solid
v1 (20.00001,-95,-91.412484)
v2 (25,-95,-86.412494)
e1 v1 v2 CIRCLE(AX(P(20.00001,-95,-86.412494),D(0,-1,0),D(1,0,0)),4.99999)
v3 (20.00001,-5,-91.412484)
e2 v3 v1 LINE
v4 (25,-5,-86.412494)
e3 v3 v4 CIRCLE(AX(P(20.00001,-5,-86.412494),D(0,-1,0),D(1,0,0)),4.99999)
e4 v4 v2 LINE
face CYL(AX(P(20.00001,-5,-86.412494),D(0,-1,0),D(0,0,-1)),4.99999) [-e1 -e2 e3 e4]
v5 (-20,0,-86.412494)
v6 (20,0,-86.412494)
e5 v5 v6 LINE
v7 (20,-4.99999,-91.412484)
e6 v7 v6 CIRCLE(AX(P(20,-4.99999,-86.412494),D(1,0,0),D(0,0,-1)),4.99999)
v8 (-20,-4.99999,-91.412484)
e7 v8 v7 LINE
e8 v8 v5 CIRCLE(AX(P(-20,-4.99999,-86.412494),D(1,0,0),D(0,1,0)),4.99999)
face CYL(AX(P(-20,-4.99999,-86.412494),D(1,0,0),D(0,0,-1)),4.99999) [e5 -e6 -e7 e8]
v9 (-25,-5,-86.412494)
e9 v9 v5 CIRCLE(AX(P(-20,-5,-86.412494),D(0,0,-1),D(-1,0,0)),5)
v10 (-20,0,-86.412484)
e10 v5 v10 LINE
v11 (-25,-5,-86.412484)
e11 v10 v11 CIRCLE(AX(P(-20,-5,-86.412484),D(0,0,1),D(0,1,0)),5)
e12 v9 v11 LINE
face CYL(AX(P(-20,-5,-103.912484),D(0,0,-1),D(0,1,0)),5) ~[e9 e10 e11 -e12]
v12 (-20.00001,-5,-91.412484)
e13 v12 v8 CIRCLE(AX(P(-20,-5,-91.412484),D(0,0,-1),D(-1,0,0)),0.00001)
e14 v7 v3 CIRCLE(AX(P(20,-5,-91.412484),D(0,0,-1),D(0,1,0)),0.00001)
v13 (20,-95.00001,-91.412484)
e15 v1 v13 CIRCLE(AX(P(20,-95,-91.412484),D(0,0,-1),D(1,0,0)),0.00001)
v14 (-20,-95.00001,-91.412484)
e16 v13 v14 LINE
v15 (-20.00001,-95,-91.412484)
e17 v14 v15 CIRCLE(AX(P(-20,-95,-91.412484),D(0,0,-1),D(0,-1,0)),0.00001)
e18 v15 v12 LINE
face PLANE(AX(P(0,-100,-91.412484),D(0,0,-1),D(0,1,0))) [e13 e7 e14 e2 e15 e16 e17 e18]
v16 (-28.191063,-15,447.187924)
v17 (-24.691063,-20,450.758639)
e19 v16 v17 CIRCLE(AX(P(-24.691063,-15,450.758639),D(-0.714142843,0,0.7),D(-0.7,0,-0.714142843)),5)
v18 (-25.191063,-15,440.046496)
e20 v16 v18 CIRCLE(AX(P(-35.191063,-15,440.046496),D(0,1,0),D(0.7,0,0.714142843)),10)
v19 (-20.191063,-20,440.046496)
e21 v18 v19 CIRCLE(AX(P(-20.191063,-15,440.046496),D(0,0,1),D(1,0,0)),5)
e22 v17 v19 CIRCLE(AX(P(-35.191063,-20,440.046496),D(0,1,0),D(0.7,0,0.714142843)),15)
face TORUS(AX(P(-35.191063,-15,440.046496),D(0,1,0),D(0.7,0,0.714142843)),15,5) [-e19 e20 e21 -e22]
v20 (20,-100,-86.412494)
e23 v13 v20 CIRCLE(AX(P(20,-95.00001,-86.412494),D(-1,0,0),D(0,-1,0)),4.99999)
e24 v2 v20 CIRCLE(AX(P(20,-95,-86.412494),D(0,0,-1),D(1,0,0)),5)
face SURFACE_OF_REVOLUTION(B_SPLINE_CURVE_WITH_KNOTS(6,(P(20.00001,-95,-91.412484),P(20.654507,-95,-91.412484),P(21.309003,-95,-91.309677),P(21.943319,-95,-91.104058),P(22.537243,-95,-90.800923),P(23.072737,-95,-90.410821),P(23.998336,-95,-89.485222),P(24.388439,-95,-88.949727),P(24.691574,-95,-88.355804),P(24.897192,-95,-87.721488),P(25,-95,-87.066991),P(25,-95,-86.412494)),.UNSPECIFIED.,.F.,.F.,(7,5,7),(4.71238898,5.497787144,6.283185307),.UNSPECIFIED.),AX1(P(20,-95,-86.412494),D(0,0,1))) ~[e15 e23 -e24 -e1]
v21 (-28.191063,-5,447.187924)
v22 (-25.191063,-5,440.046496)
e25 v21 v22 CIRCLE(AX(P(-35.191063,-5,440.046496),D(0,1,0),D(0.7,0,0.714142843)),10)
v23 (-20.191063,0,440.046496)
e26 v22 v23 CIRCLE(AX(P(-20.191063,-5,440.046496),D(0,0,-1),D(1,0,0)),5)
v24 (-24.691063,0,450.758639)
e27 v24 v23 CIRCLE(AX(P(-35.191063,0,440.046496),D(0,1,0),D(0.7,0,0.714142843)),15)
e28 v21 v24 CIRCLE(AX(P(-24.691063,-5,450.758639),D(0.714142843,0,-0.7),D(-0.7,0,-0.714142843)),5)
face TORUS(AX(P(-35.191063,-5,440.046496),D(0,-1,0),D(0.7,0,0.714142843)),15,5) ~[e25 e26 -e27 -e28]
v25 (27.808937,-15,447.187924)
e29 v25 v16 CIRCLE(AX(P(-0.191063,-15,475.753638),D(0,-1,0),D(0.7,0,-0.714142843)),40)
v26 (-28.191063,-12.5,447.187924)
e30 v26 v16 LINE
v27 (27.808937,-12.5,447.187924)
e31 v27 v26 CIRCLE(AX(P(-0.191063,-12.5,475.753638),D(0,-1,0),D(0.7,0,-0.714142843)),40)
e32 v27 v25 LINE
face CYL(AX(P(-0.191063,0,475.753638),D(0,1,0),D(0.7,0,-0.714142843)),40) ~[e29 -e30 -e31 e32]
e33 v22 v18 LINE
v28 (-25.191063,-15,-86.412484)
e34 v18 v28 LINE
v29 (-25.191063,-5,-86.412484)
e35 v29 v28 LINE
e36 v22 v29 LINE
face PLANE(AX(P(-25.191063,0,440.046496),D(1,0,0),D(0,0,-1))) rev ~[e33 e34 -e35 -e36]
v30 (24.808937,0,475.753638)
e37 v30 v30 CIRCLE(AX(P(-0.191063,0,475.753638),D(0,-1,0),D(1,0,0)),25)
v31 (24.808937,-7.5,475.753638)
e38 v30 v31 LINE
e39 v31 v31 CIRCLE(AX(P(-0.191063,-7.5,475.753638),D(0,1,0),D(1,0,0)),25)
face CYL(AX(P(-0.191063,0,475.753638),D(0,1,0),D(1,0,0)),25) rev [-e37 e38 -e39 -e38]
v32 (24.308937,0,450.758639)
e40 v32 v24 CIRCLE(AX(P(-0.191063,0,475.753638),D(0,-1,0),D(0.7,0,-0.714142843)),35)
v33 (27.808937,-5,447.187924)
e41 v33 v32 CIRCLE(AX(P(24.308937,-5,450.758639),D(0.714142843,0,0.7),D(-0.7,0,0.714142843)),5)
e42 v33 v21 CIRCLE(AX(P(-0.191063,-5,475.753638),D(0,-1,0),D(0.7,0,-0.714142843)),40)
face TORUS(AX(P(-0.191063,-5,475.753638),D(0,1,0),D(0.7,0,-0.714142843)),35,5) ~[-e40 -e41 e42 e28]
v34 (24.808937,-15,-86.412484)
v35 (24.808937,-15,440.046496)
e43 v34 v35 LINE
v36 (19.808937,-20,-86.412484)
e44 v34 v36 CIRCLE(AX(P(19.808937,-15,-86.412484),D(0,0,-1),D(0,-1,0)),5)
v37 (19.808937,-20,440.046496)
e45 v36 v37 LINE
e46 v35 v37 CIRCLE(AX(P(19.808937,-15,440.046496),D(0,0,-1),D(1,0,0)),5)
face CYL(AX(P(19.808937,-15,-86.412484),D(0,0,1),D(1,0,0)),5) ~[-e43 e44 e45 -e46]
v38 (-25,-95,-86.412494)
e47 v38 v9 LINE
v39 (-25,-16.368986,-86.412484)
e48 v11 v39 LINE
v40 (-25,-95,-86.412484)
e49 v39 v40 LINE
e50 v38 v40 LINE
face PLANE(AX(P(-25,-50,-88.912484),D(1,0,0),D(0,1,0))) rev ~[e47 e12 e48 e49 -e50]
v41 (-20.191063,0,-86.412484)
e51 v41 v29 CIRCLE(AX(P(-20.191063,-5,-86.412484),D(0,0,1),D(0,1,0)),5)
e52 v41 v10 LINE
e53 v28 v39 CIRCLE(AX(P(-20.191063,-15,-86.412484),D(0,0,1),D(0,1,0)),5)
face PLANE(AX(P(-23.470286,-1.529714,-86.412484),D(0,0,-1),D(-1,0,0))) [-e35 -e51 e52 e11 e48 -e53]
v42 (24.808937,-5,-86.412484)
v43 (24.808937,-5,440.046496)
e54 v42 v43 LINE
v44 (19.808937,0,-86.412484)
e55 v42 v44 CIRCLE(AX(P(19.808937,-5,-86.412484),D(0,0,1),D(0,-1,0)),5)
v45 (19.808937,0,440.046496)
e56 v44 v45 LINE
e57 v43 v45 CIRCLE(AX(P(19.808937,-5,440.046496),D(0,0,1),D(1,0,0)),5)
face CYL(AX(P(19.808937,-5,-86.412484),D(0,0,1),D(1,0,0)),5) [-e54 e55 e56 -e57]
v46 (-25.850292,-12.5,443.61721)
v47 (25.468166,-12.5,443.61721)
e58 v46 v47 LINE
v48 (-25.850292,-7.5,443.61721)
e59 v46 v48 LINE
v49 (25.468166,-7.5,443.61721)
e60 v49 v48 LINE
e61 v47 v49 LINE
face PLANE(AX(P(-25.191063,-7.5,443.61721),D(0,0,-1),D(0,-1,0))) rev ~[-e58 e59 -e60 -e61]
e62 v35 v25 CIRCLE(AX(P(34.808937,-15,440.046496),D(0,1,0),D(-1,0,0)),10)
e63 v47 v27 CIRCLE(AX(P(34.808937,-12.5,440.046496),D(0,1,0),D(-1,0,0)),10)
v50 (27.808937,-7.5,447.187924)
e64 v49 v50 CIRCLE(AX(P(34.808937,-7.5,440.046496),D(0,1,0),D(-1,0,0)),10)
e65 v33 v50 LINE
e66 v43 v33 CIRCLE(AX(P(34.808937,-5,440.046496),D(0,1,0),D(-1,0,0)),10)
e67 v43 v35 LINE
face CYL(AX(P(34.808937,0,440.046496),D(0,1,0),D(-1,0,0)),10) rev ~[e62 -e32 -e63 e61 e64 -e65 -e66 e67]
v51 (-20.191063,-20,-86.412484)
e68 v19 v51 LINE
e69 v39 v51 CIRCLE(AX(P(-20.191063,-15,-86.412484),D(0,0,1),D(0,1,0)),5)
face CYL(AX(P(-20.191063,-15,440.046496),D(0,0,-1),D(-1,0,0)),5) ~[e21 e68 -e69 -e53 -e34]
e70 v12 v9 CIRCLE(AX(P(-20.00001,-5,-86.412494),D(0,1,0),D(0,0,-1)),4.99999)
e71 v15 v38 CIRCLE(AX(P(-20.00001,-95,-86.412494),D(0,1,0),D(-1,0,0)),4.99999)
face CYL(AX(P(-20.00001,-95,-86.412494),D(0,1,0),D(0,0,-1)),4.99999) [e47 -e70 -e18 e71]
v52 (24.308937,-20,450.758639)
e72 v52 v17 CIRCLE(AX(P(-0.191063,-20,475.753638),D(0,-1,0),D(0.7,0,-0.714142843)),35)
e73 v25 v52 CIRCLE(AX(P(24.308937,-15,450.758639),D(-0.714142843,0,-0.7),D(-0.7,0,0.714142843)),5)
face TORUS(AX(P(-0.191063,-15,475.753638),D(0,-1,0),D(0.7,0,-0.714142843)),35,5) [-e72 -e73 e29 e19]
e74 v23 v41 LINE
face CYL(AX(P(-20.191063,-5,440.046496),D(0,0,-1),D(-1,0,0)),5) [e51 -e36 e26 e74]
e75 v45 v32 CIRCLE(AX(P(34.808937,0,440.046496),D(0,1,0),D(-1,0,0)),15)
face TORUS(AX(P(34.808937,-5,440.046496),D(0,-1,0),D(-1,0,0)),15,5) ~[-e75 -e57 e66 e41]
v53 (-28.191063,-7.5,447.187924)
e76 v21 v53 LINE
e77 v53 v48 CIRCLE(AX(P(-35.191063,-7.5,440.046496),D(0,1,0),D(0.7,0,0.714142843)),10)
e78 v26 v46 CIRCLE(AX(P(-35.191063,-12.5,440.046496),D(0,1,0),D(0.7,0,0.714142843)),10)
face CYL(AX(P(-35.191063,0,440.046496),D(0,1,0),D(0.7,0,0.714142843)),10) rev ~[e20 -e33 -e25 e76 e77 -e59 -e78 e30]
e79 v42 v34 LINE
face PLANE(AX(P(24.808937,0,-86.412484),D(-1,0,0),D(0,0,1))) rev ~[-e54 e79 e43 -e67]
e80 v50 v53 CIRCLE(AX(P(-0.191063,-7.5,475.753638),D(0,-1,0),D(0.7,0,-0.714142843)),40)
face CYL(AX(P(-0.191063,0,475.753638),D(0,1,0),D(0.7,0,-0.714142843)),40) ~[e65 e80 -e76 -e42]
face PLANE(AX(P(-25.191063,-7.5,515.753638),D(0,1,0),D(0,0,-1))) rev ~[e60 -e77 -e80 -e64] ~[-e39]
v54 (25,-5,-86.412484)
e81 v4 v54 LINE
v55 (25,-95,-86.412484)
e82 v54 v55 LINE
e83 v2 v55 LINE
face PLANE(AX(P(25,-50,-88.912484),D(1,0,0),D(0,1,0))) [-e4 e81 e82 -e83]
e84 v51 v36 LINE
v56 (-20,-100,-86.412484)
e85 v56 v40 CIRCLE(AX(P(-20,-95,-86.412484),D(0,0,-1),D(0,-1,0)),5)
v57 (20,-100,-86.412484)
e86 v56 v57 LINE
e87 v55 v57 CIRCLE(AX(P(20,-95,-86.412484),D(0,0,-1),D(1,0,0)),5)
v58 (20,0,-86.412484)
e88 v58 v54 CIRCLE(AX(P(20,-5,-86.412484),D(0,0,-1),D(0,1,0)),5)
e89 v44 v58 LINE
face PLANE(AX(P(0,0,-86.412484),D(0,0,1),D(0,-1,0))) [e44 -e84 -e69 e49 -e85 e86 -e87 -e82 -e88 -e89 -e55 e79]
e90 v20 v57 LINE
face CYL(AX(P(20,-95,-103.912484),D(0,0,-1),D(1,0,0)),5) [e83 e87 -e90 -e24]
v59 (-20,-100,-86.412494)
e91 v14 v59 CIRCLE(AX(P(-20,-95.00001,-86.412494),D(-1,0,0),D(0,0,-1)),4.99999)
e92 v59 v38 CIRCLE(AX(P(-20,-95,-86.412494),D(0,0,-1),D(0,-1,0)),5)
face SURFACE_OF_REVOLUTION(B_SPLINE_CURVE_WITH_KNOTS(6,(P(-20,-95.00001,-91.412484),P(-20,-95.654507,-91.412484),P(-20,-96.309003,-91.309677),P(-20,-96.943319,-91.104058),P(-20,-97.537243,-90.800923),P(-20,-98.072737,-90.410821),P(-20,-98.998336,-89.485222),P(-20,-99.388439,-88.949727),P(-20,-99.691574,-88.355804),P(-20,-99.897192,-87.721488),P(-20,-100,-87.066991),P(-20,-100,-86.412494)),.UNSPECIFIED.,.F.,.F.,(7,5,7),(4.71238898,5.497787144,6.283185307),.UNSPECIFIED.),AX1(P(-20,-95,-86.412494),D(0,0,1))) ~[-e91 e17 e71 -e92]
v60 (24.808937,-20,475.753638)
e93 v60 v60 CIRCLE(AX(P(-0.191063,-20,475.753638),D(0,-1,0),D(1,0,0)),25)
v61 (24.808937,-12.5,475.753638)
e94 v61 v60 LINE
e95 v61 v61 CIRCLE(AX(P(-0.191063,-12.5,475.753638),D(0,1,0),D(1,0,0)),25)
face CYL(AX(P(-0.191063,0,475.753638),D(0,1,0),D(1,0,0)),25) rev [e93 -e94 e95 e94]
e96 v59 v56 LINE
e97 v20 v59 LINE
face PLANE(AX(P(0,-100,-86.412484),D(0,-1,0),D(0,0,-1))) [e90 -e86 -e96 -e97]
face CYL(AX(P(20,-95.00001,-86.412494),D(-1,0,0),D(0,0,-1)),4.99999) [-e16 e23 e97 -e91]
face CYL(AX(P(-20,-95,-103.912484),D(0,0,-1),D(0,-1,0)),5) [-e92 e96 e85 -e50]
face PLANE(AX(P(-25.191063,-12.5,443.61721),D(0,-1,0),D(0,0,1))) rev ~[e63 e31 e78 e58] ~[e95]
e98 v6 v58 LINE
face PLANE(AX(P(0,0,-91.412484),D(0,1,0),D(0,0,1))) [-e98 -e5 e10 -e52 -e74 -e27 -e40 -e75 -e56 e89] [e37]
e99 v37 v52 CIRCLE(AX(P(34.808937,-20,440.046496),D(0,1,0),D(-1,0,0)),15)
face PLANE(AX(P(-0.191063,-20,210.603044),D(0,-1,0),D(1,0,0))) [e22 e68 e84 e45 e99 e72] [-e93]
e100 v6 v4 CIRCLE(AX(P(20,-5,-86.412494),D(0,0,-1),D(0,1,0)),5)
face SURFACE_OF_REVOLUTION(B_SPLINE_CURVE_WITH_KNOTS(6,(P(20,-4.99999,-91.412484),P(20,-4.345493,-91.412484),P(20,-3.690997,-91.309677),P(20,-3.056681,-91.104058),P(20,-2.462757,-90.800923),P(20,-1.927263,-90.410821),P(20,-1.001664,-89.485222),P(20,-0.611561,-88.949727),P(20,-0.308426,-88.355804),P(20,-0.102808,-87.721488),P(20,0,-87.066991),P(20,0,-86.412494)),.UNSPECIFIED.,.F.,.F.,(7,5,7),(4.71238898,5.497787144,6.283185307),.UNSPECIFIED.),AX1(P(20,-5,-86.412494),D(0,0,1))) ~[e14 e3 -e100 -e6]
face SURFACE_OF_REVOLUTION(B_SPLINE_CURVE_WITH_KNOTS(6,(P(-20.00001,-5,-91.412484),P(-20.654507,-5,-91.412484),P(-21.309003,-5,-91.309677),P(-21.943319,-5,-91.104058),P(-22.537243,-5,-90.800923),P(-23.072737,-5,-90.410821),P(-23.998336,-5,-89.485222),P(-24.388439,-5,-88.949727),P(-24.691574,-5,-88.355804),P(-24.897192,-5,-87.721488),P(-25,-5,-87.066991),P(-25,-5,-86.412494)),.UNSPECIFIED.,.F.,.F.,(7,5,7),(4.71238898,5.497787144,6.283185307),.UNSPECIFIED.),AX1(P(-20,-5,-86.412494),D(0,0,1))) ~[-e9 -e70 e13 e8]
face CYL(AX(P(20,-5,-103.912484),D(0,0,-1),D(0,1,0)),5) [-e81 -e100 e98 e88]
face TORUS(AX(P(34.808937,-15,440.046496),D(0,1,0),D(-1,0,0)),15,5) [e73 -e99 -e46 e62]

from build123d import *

# Parameters (mm, degrees)
F0_R        = 25
F1_DEPTH    = 20
F3_DEPTH    = 70
F4_R        = 5
F6_DEPTH    = 25
F7_T1_DEPTH = 17.5
F7_T3_DEPTH = 30
F8_R        = 4.99999


# Not quite as in the source:
# - a fillet or chamfer that OpenCascade refuses, or shapes differently, is made with other operations: its cross-section is extruded or revolved along the edge and cut away or added
# - a fillet or chamfer is up to 0.001 mm smaller than in the source, because OpenCascade refuses the exact size


with BuildPart() as f1:
    # F0 (on Front) → F1 (new body)
    with BuildSketch(Plane.XZ):
        with BuildLine():
            Line((-25.1910626888, 440.0464960357), (-25.1910626888, -86.4124843018))
            Line((-25.1910626888, -86.4124843018), (24.8089373112, -86.4124843018))
            Line((24.8089373112, -86.4124843018), (24.8089373112, 440.0464960357))
            ThreePointArc((24.8089373112, 440.0464960357), (25.5893928539, 443.9194793819), (27.8089373112, 447.1879244642))
            ThreePointArc((27.8089373112, 447.1879244642), (-0.1910626888, 515.7536381784), (-28.1910626888, 447.1879244642))
            ThreePointArc((-28.1910626888, 447.1879244642), (-25.9715182315, 443.9194793819), (-25.1910626888, 440.0464960357))
        make_face()
        with Locations((-0.1910626888, 475.7536381784)):
            Circle(F0_R, mode=Mode.SUBTRACT)
    extrude(amount=F1_DEPTH)

    # F2 (on face) → F3 (cut, symmetric)
    with BuildSketch(Plane(origin=(-25.1910626888, 0, 0), x_dir=(0, -1, 0), z_dir=(-1, 0, 0))):
        Polygon((12.5, 447.1879244642), (12.5, 450.7536381784), (12.5, 515.7536381784), (7.5, 515.7536381784), (7.5, 450.7536381784), (7.5, 447.1879244642), (7.5, 443.61721025), (12.5, 443.61721025), align=None)
    extrude(amount=F3_DEPTH, both=True, mode=Mode.SUBTRACT)

    # F4
    f4_edges = [f1.edges().sort_by_distance(p)[0] for p in [
        (-25.191063, -20, 176.817006),
        (-25.191063, 0, 176.817006),
    ]]
    fillet(f4_edges, radius=F4_R)

    # F5 (on Right) → F6 (join, symmetric)
    with BuildSketch(Plane.YZ):
        Polygon((0, -91.4124843018), (0, -86.4124843018), (-20, -86.4124843018), (-100, -86.4124843018), (-100, -91.4124843018), align=None)
    extrude(amount=F6_DEPTH, both=True)

    # F7: fillet of radius 5 on 4 edges, made by hand

    # F7_s2 → F7_t1 (cut)
    with BuildSketch(Plane.XY.offset(-103.9124843018)):
        with BuildLine():
            ThreePointArc((-20, 0), (-23.5355339059, -1.4644660941), (-25, -5))
            Line((-25, -5), (-25, 0))
            Line((-25, 0), (-20, 0))
        make_face()
    extrude(amount=F7_T1_DEPTH, mode=Mode.SUBTRACT)

    # F7_s4 → F7_t3 (cut)
    with BuildSketch(Plane.XY.offset(-103.9124843018)):
        with BuildLine():
            ThreePointArc((20, 0), (23.5355339059, -1.4644660941), (25, -5))
            Line((25, -5), (25, 0))
            Line((25, 0), (20, 0))
        make_face()
        with BuildLine():
            ThreePointArc((-20, -100), (-23.5355339059, -98.5355339059), (-25, -95))
            Line((-25, -95), (-25, -100))
            Line((-25, -100), (-20, -100))
        make_face()
        with BuildLine():
            ThreePointArc((25, -95), (23.5355339059, -98.5355339059), (20, -100))
            Line((20, -100), (25, -100))
            Line((25, -100), (25, -95))
        make_face()
    extrude(amount=F7_T3_DEPTH, mode=Mode.SUBTRACT)

    # F8 (radius 5 in the source; OpenCascade refuses exactly that, so slightly less here)
    f8_edges = [f1.edges().sort_by_distance(p)[0] for p in [
        (23.535534, -98.535534, -91.412484),
        (25, -50, -91.412484),
        (23.535534, -1.464466, -91.412484),
        (0, 0, -91.412484),
        (-23.535534, -1.464466, -91.412484),
        (-25, -50, -91.412484),
        (-23.535534, -98.535534, -91.412484),
        (0, -100, -91.412484),
    ]]
    fillet(f8_edges, radius=F8_R)


solid = f1.part
